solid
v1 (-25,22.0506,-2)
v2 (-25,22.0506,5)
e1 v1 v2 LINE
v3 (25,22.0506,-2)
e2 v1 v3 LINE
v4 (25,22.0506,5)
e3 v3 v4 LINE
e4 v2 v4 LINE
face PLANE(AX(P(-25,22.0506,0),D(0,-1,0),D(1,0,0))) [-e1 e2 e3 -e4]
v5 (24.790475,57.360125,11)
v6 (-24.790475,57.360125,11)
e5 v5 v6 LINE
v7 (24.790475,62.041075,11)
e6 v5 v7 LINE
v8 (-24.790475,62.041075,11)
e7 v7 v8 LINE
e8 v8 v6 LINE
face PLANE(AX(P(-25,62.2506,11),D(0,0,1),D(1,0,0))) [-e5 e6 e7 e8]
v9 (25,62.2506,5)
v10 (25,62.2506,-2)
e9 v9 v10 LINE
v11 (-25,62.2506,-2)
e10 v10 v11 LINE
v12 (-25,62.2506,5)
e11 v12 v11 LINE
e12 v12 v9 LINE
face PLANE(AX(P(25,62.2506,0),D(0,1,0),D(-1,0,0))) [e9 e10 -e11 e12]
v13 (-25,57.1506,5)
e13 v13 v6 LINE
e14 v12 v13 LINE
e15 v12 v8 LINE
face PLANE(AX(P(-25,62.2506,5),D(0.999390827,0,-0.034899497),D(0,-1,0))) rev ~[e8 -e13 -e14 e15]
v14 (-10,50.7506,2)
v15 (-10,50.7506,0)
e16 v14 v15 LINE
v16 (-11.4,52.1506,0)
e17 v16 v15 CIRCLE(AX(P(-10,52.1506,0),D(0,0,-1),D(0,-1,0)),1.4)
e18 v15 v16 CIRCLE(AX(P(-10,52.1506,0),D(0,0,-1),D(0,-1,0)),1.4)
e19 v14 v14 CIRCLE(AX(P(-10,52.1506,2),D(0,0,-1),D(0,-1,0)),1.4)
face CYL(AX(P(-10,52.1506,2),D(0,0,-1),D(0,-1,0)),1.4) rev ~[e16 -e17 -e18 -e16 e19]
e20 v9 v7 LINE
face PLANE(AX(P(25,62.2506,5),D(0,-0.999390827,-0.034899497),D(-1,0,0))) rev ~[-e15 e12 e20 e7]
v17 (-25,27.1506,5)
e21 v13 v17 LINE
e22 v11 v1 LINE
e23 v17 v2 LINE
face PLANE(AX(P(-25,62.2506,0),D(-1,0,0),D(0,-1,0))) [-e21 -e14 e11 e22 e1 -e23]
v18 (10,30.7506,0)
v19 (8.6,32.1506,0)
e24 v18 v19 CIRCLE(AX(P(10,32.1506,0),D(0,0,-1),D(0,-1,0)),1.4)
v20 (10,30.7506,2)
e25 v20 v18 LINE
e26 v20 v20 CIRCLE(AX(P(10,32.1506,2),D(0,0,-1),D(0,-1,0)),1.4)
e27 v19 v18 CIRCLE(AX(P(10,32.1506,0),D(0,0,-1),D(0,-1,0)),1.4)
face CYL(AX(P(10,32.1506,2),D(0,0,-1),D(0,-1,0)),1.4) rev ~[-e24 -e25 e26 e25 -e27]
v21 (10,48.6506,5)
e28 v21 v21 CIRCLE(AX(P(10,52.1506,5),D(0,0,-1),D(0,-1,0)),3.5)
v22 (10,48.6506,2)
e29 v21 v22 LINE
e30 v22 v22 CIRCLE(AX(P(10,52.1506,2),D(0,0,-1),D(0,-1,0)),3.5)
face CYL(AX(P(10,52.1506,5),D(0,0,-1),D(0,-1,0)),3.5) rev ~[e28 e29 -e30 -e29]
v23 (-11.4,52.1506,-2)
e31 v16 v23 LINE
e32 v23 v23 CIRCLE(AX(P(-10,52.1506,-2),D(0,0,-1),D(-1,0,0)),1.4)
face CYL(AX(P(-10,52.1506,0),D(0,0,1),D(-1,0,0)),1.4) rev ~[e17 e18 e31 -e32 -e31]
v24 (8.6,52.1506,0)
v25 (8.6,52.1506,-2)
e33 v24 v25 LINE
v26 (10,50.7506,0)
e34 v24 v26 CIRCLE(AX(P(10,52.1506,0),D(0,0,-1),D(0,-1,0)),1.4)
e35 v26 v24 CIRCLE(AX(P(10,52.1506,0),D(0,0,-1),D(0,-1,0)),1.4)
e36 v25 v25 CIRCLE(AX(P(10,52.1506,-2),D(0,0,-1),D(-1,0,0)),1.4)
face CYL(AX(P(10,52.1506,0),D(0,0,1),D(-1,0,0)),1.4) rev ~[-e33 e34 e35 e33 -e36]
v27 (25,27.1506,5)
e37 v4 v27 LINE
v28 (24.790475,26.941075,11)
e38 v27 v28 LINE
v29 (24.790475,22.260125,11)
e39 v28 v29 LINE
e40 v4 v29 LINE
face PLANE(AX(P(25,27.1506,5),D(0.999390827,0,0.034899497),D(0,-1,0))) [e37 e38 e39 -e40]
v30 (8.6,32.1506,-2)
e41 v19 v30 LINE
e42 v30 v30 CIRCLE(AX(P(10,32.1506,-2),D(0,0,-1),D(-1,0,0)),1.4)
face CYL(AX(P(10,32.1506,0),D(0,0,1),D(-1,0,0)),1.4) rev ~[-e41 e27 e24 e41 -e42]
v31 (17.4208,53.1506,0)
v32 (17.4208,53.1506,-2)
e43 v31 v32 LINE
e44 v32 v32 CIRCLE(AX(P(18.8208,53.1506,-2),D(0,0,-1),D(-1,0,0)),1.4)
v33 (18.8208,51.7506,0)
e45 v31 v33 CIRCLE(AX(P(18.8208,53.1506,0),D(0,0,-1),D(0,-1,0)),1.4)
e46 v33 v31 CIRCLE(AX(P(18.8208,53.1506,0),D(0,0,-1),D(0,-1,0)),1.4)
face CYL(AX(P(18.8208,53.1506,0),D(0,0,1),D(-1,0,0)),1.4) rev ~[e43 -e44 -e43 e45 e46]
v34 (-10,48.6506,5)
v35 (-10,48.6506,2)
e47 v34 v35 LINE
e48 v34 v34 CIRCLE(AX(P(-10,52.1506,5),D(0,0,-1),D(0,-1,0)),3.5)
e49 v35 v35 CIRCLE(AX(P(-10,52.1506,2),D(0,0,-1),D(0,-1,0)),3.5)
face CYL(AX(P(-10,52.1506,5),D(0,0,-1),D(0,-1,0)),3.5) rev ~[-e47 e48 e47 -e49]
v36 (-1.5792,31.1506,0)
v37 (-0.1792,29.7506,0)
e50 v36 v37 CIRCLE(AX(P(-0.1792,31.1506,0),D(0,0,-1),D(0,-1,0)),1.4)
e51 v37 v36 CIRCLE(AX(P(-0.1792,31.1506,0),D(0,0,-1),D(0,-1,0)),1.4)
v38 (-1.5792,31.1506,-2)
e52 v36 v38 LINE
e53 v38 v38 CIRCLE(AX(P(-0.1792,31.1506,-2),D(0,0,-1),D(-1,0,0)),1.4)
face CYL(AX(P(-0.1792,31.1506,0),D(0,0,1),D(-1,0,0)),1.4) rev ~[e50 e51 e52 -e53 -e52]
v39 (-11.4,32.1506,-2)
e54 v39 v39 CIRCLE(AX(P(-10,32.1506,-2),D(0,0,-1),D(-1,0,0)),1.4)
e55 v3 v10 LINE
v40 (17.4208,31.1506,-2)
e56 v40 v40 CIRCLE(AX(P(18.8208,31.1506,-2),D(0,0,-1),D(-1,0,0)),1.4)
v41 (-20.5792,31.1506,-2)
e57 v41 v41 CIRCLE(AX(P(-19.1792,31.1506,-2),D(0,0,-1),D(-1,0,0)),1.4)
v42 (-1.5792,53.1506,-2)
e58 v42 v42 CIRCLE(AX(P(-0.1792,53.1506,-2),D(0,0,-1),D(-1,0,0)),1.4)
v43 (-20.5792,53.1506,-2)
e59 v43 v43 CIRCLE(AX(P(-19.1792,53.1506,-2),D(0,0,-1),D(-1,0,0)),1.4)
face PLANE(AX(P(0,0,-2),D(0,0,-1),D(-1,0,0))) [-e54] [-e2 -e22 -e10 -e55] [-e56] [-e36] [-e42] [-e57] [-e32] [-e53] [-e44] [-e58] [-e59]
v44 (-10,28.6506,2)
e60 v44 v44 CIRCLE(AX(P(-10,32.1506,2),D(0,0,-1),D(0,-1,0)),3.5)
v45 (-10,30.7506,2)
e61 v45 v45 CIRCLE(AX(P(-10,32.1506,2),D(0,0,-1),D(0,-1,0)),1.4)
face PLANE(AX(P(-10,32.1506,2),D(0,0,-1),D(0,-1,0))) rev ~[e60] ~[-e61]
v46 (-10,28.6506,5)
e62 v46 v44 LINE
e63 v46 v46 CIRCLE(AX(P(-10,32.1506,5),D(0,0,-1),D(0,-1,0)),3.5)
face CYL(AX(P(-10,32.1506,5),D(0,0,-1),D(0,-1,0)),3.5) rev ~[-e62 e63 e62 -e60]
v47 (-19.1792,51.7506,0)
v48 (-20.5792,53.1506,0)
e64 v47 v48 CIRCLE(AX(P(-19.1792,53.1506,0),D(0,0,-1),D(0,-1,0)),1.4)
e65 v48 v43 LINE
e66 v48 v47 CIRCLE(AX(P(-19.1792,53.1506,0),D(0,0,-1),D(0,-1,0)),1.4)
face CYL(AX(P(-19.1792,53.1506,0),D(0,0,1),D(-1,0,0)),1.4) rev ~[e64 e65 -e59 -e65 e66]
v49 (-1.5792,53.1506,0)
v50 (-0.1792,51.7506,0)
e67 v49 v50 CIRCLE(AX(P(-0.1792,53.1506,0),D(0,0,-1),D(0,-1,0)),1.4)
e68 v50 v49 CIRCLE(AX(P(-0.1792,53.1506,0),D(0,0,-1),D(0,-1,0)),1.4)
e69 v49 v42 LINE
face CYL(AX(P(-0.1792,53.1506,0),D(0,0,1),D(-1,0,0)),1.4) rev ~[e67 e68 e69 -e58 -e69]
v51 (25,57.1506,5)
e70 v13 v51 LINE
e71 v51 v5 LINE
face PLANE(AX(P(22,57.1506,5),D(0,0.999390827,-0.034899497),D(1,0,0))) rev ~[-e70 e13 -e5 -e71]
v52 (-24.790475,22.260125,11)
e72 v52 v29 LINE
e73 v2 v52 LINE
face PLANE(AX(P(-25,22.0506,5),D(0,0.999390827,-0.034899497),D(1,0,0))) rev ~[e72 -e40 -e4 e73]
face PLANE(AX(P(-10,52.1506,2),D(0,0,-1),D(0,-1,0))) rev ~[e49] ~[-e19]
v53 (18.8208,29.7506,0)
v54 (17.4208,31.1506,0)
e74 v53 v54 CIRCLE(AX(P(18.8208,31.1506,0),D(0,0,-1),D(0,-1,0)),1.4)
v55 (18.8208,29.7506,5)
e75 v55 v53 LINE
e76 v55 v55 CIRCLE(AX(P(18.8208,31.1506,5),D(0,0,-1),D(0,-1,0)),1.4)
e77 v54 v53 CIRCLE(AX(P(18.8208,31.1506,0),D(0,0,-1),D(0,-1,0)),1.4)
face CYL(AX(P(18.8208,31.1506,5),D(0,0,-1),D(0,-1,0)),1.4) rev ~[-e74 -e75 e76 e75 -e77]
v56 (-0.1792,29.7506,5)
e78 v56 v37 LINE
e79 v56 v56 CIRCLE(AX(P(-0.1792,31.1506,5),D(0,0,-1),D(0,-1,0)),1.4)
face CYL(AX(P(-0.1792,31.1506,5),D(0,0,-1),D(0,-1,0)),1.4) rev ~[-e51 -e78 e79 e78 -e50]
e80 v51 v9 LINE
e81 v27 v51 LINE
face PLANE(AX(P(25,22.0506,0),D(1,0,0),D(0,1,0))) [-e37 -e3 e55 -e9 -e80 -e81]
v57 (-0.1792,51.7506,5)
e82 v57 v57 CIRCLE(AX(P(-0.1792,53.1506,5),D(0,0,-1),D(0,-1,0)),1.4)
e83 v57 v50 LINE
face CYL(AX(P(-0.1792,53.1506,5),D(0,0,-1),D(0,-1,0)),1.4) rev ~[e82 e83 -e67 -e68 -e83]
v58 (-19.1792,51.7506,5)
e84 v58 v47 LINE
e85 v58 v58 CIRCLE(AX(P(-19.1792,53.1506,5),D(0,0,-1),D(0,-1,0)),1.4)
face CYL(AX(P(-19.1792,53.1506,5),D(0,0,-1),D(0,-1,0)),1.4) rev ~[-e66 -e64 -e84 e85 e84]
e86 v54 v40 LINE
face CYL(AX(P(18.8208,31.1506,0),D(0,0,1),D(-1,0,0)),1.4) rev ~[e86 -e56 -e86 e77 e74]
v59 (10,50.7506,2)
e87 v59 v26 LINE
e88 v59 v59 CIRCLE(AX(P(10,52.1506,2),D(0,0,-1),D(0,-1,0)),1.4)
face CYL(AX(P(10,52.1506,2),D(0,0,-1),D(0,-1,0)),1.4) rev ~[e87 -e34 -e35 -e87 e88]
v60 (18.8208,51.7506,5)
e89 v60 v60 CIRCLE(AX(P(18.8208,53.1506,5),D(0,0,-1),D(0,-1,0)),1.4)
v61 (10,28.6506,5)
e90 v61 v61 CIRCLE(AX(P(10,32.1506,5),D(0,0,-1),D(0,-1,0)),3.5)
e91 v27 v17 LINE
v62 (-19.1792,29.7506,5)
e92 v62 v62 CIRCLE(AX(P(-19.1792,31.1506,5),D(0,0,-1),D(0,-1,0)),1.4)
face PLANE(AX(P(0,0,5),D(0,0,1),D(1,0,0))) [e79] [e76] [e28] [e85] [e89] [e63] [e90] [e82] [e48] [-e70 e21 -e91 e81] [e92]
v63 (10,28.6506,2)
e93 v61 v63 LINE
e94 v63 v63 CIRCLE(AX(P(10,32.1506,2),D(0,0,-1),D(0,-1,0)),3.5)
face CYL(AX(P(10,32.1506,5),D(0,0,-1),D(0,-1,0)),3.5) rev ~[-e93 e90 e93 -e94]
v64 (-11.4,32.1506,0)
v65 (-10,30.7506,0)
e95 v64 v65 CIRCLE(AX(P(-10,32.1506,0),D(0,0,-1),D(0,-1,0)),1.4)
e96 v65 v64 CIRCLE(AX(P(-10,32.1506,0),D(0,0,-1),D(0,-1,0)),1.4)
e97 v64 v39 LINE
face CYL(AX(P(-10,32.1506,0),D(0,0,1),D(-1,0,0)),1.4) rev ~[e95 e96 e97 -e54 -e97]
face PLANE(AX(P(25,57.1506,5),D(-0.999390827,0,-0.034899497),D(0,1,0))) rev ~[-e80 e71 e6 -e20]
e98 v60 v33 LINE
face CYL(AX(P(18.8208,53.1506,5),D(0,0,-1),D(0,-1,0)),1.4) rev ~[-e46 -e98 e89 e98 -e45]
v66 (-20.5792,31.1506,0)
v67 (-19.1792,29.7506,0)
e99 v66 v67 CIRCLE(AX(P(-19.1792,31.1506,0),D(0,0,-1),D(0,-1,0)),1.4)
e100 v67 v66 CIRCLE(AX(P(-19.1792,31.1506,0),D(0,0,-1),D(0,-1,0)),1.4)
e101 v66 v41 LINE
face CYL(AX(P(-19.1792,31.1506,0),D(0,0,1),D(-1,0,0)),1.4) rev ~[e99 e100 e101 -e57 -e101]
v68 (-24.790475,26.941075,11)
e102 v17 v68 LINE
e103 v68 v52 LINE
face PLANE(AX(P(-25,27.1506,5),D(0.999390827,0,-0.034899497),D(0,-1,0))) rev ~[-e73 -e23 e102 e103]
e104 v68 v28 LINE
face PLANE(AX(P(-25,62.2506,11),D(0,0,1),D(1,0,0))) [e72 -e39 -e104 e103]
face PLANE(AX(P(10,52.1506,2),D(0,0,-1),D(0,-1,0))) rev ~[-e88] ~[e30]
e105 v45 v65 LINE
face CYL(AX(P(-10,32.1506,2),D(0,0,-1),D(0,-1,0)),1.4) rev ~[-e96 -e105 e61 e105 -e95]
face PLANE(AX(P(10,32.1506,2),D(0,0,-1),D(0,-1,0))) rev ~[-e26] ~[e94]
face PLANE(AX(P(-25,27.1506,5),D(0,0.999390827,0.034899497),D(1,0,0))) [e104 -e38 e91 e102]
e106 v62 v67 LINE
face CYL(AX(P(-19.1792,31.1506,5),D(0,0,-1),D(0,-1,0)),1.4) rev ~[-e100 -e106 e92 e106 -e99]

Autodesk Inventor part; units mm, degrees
ref_plane "YZ Plane" through (0, 0, 0) normal (1, 0, 0) x (0, 1, 0)
ref_plane "XZ Plane" through (0, 0, 0) normal (0, 1, 0) x (-1, 0, 0)
ref_plane "Arbeitsebene1" through (0, 0, 0) normal (0, 0, 1) x (1, 0, 0)
sketch "Skizze1" plane through (0, 0, 0) normal (0, 0, 1) x (1, 0, 0)
  line L0 (15, 26.0506) -> (15, 58.2506) projected
  line L1 (15, 58.2506) -> (-15, 58.2506) projected
  line L2 (-15, 58.2506) -> (-15, 26.0506) projected
  line L3 (-15, 26.0506) -> (15, 26.0506) projected
  circle A0 centre (10, 32.1506) radius 1.25 construction
  circle A1 centre (-10, 32.1506) radius 1.25 construction
  circle A2 centre (-10, 52.1506) radius 1.25 construction
  circle A3 centre (10, 52.1506) radius 1.25 construction
  circle A4 centre (7.5, 38.0506) radius 3.25 construction
  circle A5 centre (7.5, 46.2506) radius 3.25 construction
  circle A6 centre (-7.5, 38.0506) radius 3.25 construction
  circle A7 centre (-7.5, 46.2506) radius 3.25 construction
  line L4 (-65, 27.1506) -> (-65, 57.1506) projected
  circle A8 centre (10, 32.1506) radius 1.25
  circle A9 centre (-10, 32.1506) radius 1.25
  circle A10 centre (-10, 52.1506) radius 1.25
  circle A11 centre (10, 52.1506) radius 1.25
  line L5 (15, 58.2506) -> (25, 58.2506)
  line L6 (25, 58.2506) -> (25, 26.0506)
  line L7 (25, 26.0506) -> (15, 26.0506)
  line L8 (15, 26.0506) -> (15, 58.2506)
  line L9 (-15, 58.2506) -> (-25, 58.2506)
  line L10 (-25, 58.2506) -> (-25, 26.0506)
  line L11 (-25, 26.0506) -> (-15, 26.0506)
  line L12 (-15, 26.0506) -> (-15, 58.2506)
  line L13 (25, 26.0506) -> (-25, 26.0506)
  line L14 (-25, 26.0506) -> (-25, 22.0506)
  line L15 (-25, 22.0506) -> (25, 22.0506)
  line L16 (25, 22.0506) -> (25, 26.0506)
  line L17 (25, 58.2506) -> (-25, 58.2506)
  line L18 (-25, 58.2506) -> (-25, 62.2506)
  line L19 (-25, 62.2506) -> (25, 62.2506)
  line L20 (25, 62.2506) -> (25, 58.2506)
  point P0 (0, 0)
  dimension "d19" = 10
  dimension "d20" = 10
  dimension "d26" = 4
  dimension "d27" = 4
ref_plane "Arbeitsebene2" through (-72, 28.2506, 5) normal (0, 0, -1) x (0, 1, 0)
extrude "Extrusion1" add sketch "Skizze1" along normal up to surface (5 mm away)
sketch "Skizze2" plane through (-15, 58.2506, 5) normal (0, 0, 1) x (1, 0, 0)
  circle A0 centre (25, -26.1) radius 1.25 projected
  circle A1 centre (5, -26.1) radius 1.25 projected
  circle A2 centre (5, -6.1) radius 1.25 projected
  circle A3 centre (25, -6.1) radius 1.25 projected
  point P0 (15, -58.2506)
hole "Bohrung1" at (10, 32.1506, 5) at (-10, 32.1506, 5) at (-10, 52.1506, 5) at (10, 52.1506, 5) direction (0, 0, -1) diameter 2.8 end through all counterbore diameter 7 counterbore depth 3
sketch "Skizze3" plane through (-15, 58.2506, 5) normal (0, 0, 1) x (1, 0, 0)
  circle A0 centre (14.8208, -23.6) radius 1.7 projected
  circle A1 centre (14.8208, -8.6) radius 1.7 projected
  circle A2 centre (5, -6.1) radius 3.5 projected
  circle A3 centre (25, -26.1) radius 3.5 projected
  circle A4 centre (5, -26.1) radius 3.5 projected
  circle A5 centre (25, -6.1) radius 3.5 projected
  line L0 (-10, 0) -> (-10, -32.2) projected
  line L1 (-10, -16.1) -> (40, -16.1)
  line L2 (40, -32.2) -> (40, 0) projected
  circle A6 centre (14.8208, -5.1) radius 1.5853
  circle A7 centre (14.8208, -27.1) radius 2.0333
  point P0 (15, -58.2506)
  dimension "d24" = 11
  dimension "d25" = 11
hole "Bohrung2" at (-0.1792, 31.1506, 5) at (-0.1792, 53.1506, 5) direction (0, 0, -1) diameter 2.8 end through all
pattern_linear "Rechteckige Anordnung1" count 3 spacing 19 along (-1, 0, 0) of "Bohrung2" first direction both ways yes
sketch "Skizze5" plane through (-25, 62.2506, 5) normal (0, 0, 1) x (1, 0, 0)
  line L0 (-41, -5.1) -> (47, -5.1) projected
  line L1 (-24.541, -42.8) -> (44.8306, -42.8) projected
  line L2 (16.25, -40.0792) -> (10.75, -40.0792) projected
  line L3 (0, -40.2) -> (50, -40.2) projected
  line L4 (50, 0) -> (0, 0) projected
  line L5 (-41, -35.1) -> (47, -35.1) projected
  line L6 (50, 0) -> (0, 0)
  line L7 (0, 0) -> (0, -5.1)
  line L8 (0, -5.1) -> (50, -5.1)
  line L9 (50, -5.1) -> (50, 0)
  line L10 (0, -40.2) -> (50, -40.2) projected
  line L11 (0, 0) -> (0, -40.2) projected
  line L12 (50, -40.2) -> (0, -40.2)
  line L13 (0, -40.2) -> (0, -35.1)
  line L14 (0, -35.1) -> (50, -35.1)
  line L15 (50, -35.1) -> (50, -40.2)
  point P0 (25, -62.2506)
  point P1 (47, -5.1)
extrude "Extrusion3" add sketch "Skizze5" along normal blind 6 draft -2
sketch "Skizze6" plane through (0, 0, 0) normal (0, 0, -1) x (-1, 0, 0)
  circle A0 centre (19.1792, 31.1506) radius 1.4 projected
  circle A1 centre (19.1792, 53.1506) radius 1.4 projected
  circle A2 centre (-18.8208, 31.1506) radius 1.4 projected
  circle A3 centre (-18.8208, 53.1506) radius 1.4 projected
  circle A4 centre (0.1792, 31.1506) radius 1.4 projected
  circle A5 centre (0.1792, 53.1506) radius 1.4 projected
  circle A6 centre (10, 52.1506) radius 1.4 projected
  circle A7 centre (-10, 32.1506) radius 1.4 projected
  circle A8 centre (10, 32.1506) radius 1.4 projected
  circle A9 centre (-10, 52.1506) radius 1.4 projected
  line L0 (25, 62.2506) -> (25, 22.0506) projected
  line L1 (-25, 62.2506) -> (25, 62.2506) projected
  line L2 (-25, 22.0506) -> (-25, 62.2506) projected
  line L3 (25, 22.0506) -> (-25, 22.0506) projected
  point P0 (0, 0)
extrude "Extrusion4" add sketch "Skizze6" along normal blind 2
properties part number "20_Cube_Insert_Linear_Stage_NEMA11_china_xymount"
